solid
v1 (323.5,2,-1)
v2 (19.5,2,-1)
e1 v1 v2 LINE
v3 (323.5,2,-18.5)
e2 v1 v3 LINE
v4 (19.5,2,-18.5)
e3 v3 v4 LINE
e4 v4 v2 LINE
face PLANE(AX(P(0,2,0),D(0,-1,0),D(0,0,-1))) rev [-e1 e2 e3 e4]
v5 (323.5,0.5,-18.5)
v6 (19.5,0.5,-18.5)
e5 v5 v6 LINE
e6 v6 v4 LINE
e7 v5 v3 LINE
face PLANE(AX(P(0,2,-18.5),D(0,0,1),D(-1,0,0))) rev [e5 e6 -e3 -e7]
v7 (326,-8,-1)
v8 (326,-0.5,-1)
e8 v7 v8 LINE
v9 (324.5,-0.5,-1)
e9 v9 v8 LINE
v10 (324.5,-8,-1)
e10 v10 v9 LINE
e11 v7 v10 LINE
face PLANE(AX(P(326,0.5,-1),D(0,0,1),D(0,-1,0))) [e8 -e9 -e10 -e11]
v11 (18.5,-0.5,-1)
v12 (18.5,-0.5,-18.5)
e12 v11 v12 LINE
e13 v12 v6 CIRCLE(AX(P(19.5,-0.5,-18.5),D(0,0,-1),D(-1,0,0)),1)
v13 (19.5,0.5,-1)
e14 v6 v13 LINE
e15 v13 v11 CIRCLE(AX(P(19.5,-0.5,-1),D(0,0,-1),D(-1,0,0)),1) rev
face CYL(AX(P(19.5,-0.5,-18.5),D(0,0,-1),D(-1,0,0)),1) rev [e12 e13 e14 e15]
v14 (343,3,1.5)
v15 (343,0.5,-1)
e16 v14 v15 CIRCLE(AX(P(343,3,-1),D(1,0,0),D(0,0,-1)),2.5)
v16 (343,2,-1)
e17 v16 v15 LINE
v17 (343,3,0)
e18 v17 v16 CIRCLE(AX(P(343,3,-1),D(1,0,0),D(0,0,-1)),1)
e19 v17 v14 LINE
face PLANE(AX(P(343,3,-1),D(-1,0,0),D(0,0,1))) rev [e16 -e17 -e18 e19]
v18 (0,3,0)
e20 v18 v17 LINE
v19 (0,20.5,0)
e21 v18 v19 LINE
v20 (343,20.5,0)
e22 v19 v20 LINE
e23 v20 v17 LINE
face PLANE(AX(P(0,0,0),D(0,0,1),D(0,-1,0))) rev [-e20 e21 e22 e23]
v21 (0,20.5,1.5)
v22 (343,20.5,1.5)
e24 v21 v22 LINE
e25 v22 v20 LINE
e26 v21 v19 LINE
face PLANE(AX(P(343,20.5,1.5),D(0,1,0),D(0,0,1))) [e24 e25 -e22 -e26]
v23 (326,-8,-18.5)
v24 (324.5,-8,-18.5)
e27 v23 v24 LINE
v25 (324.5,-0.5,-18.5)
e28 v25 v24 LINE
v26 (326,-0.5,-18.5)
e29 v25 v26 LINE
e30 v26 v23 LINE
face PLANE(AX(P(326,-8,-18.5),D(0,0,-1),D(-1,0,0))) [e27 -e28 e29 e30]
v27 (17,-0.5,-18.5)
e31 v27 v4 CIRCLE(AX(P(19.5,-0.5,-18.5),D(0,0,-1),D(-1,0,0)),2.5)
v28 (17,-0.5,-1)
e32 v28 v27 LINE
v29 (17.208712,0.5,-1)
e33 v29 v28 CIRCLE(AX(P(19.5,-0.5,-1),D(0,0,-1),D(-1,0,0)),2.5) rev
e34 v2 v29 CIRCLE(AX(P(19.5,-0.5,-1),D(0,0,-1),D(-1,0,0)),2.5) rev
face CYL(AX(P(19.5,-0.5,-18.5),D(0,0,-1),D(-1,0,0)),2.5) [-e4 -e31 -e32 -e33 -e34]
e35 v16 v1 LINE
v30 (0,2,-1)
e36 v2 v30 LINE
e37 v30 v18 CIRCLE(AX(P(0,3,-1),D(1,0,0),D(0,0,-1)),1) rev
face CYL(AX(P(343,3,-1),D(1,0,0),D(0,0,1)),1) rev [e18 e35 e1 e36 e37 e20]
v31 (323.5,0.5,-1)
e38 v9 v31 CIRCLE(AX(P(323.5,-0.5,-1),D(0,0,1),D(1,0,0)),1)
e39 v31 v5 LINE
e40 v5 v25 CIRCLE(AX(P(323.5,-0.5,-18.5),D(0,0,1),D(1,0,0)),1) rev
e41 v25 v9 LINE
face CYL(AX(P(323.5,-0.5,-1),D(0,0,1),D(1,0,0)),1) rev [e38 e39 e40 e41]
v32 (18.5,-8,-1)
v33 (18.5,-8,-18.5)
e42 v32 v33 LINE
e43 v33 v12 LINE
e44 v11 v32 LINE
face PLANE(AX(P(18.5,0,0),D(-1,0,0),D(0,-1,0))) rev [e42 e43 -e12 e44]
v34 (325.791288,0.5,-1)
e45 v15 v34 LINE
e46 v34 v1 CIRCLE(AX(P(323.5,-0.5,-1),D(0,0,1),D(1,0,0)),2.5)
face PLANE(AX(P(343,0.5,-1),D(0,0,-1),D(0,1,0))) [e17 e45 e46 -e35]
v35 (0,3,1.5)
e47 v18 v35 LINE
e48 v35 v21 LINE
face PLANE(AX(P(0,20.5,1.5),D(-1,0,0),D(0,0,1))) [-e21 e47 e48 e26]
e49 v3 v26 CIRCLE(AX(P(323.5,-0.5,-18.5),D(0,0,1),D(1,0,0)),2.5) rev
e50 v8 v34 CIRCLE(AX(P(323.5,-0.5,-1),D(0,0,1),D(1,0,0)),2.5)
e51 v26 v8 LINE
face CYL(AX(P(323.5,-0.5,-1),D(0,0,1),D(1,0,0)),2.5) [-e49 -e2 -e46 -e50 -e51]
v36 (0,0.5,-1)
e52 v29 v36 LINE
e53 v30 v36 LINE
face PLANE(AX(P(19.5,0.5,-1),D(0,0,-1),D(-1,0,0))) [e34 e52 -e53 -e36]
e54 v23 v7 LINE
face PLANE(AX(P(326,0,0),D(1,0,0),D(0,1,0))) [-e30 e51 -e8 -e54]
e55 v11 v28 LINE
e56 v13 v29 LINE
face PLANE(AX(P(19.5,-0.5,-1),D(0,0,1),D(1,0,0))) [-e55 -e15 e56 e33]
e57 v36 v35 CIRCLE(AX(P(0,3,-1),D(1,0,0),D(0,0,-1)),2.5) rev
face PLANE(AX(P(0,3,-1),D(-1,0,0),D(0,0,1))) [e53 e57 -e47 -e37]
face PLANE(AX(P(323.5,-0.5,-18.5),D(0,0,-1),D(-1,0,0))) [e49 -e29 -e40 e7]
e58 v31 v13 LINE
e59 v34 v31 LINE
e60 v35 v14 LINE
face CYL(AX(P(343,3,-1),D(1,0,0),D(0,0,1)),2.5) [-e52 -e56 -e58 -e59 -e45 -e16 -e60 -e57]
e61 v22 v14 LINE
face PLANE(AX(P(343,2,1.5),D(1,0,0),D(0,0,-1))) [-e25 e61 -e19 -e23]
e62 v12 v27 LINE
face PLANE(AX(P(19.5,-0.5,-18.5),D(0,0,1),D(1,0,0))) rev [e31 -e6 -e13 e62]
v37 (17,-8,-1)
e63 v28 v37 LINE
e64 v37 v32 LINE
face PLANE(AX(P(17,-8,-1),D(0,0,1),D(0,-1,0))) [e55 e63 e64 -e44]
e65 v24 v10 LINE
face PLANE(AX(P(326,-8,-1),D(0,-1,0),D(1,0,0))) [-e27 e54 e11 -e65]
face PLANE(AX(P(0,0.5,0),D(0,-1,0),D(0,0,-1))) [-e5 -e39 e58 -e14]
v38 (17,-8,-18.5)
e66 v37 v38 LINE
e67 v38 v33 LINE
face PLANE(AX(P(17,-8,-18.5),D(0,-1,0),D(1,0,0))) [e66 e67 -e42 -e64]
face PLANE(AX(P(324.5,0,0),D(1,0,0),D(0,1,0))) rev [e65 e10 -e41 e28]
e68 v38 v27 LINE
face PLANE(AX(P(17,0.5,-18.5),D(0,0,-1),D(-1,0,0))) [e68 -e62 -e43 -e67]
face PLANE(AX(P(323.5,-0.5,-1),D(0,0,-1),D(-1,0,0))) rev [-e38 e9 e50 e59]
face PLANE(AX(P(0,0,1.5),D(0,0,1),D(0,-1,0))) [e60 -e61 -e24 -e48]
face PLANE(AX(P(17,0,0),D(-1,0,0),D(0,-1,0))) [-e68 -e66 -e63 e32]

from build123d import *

# Parameters (mm, degrees)
SKETCH_1_W                       = 343
SKETCH_1_H                       = 18.5
EXTRUDE_1_DEPTH                  = 2
SHEET_METAL_1_OUTLINE_W          = 343
SHEET_METAL_1_OUTLINE_H          = 18.5
SHEET_METAL_1_DEPTH              = 0.5
SM_EDGE_FLANGE_1_STRIP_W         = 8
SM_EDGE_FLANGE_1_STRIP_H         = 1.5
SM_EDGE_FLANGE_1_STRIP_CUT_DEPTH = 343
SM_EDGE_FLANGE_1_DEPTH           = 343
SM_EDGE_FLANGE_2_STRIP_W         = 26.5
SM_EDGE_FLANGE_2_STRIP_H         = 1.5
SM_EDGE_FLANGE_2_STRIP_CUT_DEPTH = 17.5
SM_EDGE_FLANGE_2_DEPTH           = 17.5
SM_EDGE_FLANGE_3_STRIP_W         = 26.5
SM_EDGE_FLANGE_3_STRIP_H         = 1.5
SM_EDGE_FLANGE_3_STRIP_CUT_DEPTH = 17.5
SM_EDGE_FLANGE_3_DEPTH           = 17.5


# Read off the part's stored shape, not the designer's step: Преобразовать-Твердое тело1
# Sheet-metal steps are written as plain solids
with BuildPart() as part:
    # Sketch 1 → Бобышка-Вытянуть1 (new body)
    with BuildSketch(Plane(origin=(0, 0, 0), x_dir=(1, 0, 0), z_dir=(0, 1, 0))):
        with Locations((171.5, 9.25)):
            Rectangle(SKETCH_1_W, SKETCH_1_H)
    extrude(amount=EXTRUDE_1_DEPTH)

    # Sheet Metal 1 outline → Sheet Metal 1 (cut)
    with BuildSketch(Plane(origin=(0, 0, 0), x_dir=(1, 0, 0), z_dir=(0, 1, 0))):
        with Locations((171.5, 9.25)):
            Rectangle(SHEET_METAL_1_OUTLINE_W, SHEET_METAL_1_OUTLINE_H)
    extrude(amount=SHEET_METAL_1_DEPTH, mode=Mode.SUBTRACT)

    # Ребро-кромка1 strip (across the edge) → Ребро-кромка1 strip cut (cut)
    with BuildSketch(Plane(origin=(0, 2, 0), x_dir=(0, 0, -1), z_dir=(1, 0, 0))):
        with Locations((-3, -0.75)):
            Rectangle(SM_EDGE_FLANGE_1_STRIP_W, SM_EDGE_FLANGE_1_STRIP_H)
    extrude(amount=SM_EDGE_FLANGE_1_STRIP_CUT_DEPTH, mode=Mode.SUBTRACT)

    # Ребро-кромка1 section (across the edge) → Ребро-кромка1 (add)
    with BuildSketch(Plane(origin=(0, 2, 0), x_dir=(0, 0, -1), z_dir=(1, 0, 0))):
        with BuildLine():
            Line((-1.5, 1), (-1.5, 18.5))
            Line((-1.5, 18.5), (0, 18.5))
            Line((0, 18.5), (0, 1))
            ThreePointArc((0, 1), (0.292893219, 0.292893219), (1, 0))
            Line((1, 0), (1, -1.5))
            ThreePointArc((1, -1.5), (-0.767766953, -0.767766953), (-1.5, 1))
        make_face()
    extrude(amount=SM_EDGE_FLANGE_1_DEPTH)

    # Ребро-кромка2 strip (across the edge) → Ребро-кромка2 strip cut (cut)
    with BuildSketch(Plane(origin=(18.5, 0.5, -1), x_dir=(1, 0, 0), z_dir=(0, 0, -1))):
        with Locations((-12.25, -0.75)):
            Rectangle(SM_EDGE_FLANGE_2_STRIP_W, SM_EDGE_FLANGE_2_STRIP_H)
    extrude(amount=SM_EDGE_FLANGE_2_STRIP_CUT_DEPTH, mode=Mode.SUBTRACT)

    # Ребро-кромка2 section (across the edge) → Ребро-кромка2 (add)
    with BuildSketch(Plane(origin=(18.5, 0.5, -1), x_dir=(1, 0, 0), z_dir=(0, 0, -1))):
        with BuildLine():
            Line((-1.5, 1), (-1.5, 8.5))
            Line((-1.5, 8.5), (0, 8.5))
            Line((0, 8.5), (0, 1))
            ThreePointArc((0, 1), (0.292893219, 0.292893219), (1, 0))
            Line((1, 0), (1, -1.5))
            ThreePointArc((1, -1.5), (-0.767766953, -0.767766953), (-1.5, 1))
        make_face()
    extrude(amount=SM_EDGE_FLANGE_2_DEPTH)

    # Ребро-кромка3 strip (across the edge) → Ребро-кромка3 strip cut (cut)
    with BuildSketch(Plane(origin=(324.5, 0.5, -18.5), x_dir=(-1, 0, 0), z_dir=(0, 0, 1))):
        with Locations((-12.25, -0.75)):
            Rectangle(SM_EDGE_FLANGE_3_STRIP_W, SM_EDGE_FLANGE_3_STRIP_H)
    extrude(amount=SM_EDGE_FLANGE_3_STRIP_CUT_DEPTH, mode=Mode.SUBTRACT)

    # Ребро-кромка3 section (across the edge) → Ребро-кромка3 (add)
    with BuildSketch(Plane(origin=(324.5, 0.5, -18.5), x_dir=(-1, 0, 0), z_dir=(0, 0, 1))):
        with BuildLine():
            Line((-1.5, 1), (-1.5, 8.5))
            Line((-1.5, 8.5), (0, 8.5))
            Line((0, 8.5), (0, 1))
            ThreePointArc((0, 1), (0.292893219, 0.292893219), (1, 0))
            Line((1, 0), (1, -1.5))
            ThreePointArc((1, -1.5), (-0.767766953, -0.767766953), (-1.5, 1))
        make_face()
    extrude(amount=SM_EDGE_FLANGE_3_DEPTH)


solid = part.part
